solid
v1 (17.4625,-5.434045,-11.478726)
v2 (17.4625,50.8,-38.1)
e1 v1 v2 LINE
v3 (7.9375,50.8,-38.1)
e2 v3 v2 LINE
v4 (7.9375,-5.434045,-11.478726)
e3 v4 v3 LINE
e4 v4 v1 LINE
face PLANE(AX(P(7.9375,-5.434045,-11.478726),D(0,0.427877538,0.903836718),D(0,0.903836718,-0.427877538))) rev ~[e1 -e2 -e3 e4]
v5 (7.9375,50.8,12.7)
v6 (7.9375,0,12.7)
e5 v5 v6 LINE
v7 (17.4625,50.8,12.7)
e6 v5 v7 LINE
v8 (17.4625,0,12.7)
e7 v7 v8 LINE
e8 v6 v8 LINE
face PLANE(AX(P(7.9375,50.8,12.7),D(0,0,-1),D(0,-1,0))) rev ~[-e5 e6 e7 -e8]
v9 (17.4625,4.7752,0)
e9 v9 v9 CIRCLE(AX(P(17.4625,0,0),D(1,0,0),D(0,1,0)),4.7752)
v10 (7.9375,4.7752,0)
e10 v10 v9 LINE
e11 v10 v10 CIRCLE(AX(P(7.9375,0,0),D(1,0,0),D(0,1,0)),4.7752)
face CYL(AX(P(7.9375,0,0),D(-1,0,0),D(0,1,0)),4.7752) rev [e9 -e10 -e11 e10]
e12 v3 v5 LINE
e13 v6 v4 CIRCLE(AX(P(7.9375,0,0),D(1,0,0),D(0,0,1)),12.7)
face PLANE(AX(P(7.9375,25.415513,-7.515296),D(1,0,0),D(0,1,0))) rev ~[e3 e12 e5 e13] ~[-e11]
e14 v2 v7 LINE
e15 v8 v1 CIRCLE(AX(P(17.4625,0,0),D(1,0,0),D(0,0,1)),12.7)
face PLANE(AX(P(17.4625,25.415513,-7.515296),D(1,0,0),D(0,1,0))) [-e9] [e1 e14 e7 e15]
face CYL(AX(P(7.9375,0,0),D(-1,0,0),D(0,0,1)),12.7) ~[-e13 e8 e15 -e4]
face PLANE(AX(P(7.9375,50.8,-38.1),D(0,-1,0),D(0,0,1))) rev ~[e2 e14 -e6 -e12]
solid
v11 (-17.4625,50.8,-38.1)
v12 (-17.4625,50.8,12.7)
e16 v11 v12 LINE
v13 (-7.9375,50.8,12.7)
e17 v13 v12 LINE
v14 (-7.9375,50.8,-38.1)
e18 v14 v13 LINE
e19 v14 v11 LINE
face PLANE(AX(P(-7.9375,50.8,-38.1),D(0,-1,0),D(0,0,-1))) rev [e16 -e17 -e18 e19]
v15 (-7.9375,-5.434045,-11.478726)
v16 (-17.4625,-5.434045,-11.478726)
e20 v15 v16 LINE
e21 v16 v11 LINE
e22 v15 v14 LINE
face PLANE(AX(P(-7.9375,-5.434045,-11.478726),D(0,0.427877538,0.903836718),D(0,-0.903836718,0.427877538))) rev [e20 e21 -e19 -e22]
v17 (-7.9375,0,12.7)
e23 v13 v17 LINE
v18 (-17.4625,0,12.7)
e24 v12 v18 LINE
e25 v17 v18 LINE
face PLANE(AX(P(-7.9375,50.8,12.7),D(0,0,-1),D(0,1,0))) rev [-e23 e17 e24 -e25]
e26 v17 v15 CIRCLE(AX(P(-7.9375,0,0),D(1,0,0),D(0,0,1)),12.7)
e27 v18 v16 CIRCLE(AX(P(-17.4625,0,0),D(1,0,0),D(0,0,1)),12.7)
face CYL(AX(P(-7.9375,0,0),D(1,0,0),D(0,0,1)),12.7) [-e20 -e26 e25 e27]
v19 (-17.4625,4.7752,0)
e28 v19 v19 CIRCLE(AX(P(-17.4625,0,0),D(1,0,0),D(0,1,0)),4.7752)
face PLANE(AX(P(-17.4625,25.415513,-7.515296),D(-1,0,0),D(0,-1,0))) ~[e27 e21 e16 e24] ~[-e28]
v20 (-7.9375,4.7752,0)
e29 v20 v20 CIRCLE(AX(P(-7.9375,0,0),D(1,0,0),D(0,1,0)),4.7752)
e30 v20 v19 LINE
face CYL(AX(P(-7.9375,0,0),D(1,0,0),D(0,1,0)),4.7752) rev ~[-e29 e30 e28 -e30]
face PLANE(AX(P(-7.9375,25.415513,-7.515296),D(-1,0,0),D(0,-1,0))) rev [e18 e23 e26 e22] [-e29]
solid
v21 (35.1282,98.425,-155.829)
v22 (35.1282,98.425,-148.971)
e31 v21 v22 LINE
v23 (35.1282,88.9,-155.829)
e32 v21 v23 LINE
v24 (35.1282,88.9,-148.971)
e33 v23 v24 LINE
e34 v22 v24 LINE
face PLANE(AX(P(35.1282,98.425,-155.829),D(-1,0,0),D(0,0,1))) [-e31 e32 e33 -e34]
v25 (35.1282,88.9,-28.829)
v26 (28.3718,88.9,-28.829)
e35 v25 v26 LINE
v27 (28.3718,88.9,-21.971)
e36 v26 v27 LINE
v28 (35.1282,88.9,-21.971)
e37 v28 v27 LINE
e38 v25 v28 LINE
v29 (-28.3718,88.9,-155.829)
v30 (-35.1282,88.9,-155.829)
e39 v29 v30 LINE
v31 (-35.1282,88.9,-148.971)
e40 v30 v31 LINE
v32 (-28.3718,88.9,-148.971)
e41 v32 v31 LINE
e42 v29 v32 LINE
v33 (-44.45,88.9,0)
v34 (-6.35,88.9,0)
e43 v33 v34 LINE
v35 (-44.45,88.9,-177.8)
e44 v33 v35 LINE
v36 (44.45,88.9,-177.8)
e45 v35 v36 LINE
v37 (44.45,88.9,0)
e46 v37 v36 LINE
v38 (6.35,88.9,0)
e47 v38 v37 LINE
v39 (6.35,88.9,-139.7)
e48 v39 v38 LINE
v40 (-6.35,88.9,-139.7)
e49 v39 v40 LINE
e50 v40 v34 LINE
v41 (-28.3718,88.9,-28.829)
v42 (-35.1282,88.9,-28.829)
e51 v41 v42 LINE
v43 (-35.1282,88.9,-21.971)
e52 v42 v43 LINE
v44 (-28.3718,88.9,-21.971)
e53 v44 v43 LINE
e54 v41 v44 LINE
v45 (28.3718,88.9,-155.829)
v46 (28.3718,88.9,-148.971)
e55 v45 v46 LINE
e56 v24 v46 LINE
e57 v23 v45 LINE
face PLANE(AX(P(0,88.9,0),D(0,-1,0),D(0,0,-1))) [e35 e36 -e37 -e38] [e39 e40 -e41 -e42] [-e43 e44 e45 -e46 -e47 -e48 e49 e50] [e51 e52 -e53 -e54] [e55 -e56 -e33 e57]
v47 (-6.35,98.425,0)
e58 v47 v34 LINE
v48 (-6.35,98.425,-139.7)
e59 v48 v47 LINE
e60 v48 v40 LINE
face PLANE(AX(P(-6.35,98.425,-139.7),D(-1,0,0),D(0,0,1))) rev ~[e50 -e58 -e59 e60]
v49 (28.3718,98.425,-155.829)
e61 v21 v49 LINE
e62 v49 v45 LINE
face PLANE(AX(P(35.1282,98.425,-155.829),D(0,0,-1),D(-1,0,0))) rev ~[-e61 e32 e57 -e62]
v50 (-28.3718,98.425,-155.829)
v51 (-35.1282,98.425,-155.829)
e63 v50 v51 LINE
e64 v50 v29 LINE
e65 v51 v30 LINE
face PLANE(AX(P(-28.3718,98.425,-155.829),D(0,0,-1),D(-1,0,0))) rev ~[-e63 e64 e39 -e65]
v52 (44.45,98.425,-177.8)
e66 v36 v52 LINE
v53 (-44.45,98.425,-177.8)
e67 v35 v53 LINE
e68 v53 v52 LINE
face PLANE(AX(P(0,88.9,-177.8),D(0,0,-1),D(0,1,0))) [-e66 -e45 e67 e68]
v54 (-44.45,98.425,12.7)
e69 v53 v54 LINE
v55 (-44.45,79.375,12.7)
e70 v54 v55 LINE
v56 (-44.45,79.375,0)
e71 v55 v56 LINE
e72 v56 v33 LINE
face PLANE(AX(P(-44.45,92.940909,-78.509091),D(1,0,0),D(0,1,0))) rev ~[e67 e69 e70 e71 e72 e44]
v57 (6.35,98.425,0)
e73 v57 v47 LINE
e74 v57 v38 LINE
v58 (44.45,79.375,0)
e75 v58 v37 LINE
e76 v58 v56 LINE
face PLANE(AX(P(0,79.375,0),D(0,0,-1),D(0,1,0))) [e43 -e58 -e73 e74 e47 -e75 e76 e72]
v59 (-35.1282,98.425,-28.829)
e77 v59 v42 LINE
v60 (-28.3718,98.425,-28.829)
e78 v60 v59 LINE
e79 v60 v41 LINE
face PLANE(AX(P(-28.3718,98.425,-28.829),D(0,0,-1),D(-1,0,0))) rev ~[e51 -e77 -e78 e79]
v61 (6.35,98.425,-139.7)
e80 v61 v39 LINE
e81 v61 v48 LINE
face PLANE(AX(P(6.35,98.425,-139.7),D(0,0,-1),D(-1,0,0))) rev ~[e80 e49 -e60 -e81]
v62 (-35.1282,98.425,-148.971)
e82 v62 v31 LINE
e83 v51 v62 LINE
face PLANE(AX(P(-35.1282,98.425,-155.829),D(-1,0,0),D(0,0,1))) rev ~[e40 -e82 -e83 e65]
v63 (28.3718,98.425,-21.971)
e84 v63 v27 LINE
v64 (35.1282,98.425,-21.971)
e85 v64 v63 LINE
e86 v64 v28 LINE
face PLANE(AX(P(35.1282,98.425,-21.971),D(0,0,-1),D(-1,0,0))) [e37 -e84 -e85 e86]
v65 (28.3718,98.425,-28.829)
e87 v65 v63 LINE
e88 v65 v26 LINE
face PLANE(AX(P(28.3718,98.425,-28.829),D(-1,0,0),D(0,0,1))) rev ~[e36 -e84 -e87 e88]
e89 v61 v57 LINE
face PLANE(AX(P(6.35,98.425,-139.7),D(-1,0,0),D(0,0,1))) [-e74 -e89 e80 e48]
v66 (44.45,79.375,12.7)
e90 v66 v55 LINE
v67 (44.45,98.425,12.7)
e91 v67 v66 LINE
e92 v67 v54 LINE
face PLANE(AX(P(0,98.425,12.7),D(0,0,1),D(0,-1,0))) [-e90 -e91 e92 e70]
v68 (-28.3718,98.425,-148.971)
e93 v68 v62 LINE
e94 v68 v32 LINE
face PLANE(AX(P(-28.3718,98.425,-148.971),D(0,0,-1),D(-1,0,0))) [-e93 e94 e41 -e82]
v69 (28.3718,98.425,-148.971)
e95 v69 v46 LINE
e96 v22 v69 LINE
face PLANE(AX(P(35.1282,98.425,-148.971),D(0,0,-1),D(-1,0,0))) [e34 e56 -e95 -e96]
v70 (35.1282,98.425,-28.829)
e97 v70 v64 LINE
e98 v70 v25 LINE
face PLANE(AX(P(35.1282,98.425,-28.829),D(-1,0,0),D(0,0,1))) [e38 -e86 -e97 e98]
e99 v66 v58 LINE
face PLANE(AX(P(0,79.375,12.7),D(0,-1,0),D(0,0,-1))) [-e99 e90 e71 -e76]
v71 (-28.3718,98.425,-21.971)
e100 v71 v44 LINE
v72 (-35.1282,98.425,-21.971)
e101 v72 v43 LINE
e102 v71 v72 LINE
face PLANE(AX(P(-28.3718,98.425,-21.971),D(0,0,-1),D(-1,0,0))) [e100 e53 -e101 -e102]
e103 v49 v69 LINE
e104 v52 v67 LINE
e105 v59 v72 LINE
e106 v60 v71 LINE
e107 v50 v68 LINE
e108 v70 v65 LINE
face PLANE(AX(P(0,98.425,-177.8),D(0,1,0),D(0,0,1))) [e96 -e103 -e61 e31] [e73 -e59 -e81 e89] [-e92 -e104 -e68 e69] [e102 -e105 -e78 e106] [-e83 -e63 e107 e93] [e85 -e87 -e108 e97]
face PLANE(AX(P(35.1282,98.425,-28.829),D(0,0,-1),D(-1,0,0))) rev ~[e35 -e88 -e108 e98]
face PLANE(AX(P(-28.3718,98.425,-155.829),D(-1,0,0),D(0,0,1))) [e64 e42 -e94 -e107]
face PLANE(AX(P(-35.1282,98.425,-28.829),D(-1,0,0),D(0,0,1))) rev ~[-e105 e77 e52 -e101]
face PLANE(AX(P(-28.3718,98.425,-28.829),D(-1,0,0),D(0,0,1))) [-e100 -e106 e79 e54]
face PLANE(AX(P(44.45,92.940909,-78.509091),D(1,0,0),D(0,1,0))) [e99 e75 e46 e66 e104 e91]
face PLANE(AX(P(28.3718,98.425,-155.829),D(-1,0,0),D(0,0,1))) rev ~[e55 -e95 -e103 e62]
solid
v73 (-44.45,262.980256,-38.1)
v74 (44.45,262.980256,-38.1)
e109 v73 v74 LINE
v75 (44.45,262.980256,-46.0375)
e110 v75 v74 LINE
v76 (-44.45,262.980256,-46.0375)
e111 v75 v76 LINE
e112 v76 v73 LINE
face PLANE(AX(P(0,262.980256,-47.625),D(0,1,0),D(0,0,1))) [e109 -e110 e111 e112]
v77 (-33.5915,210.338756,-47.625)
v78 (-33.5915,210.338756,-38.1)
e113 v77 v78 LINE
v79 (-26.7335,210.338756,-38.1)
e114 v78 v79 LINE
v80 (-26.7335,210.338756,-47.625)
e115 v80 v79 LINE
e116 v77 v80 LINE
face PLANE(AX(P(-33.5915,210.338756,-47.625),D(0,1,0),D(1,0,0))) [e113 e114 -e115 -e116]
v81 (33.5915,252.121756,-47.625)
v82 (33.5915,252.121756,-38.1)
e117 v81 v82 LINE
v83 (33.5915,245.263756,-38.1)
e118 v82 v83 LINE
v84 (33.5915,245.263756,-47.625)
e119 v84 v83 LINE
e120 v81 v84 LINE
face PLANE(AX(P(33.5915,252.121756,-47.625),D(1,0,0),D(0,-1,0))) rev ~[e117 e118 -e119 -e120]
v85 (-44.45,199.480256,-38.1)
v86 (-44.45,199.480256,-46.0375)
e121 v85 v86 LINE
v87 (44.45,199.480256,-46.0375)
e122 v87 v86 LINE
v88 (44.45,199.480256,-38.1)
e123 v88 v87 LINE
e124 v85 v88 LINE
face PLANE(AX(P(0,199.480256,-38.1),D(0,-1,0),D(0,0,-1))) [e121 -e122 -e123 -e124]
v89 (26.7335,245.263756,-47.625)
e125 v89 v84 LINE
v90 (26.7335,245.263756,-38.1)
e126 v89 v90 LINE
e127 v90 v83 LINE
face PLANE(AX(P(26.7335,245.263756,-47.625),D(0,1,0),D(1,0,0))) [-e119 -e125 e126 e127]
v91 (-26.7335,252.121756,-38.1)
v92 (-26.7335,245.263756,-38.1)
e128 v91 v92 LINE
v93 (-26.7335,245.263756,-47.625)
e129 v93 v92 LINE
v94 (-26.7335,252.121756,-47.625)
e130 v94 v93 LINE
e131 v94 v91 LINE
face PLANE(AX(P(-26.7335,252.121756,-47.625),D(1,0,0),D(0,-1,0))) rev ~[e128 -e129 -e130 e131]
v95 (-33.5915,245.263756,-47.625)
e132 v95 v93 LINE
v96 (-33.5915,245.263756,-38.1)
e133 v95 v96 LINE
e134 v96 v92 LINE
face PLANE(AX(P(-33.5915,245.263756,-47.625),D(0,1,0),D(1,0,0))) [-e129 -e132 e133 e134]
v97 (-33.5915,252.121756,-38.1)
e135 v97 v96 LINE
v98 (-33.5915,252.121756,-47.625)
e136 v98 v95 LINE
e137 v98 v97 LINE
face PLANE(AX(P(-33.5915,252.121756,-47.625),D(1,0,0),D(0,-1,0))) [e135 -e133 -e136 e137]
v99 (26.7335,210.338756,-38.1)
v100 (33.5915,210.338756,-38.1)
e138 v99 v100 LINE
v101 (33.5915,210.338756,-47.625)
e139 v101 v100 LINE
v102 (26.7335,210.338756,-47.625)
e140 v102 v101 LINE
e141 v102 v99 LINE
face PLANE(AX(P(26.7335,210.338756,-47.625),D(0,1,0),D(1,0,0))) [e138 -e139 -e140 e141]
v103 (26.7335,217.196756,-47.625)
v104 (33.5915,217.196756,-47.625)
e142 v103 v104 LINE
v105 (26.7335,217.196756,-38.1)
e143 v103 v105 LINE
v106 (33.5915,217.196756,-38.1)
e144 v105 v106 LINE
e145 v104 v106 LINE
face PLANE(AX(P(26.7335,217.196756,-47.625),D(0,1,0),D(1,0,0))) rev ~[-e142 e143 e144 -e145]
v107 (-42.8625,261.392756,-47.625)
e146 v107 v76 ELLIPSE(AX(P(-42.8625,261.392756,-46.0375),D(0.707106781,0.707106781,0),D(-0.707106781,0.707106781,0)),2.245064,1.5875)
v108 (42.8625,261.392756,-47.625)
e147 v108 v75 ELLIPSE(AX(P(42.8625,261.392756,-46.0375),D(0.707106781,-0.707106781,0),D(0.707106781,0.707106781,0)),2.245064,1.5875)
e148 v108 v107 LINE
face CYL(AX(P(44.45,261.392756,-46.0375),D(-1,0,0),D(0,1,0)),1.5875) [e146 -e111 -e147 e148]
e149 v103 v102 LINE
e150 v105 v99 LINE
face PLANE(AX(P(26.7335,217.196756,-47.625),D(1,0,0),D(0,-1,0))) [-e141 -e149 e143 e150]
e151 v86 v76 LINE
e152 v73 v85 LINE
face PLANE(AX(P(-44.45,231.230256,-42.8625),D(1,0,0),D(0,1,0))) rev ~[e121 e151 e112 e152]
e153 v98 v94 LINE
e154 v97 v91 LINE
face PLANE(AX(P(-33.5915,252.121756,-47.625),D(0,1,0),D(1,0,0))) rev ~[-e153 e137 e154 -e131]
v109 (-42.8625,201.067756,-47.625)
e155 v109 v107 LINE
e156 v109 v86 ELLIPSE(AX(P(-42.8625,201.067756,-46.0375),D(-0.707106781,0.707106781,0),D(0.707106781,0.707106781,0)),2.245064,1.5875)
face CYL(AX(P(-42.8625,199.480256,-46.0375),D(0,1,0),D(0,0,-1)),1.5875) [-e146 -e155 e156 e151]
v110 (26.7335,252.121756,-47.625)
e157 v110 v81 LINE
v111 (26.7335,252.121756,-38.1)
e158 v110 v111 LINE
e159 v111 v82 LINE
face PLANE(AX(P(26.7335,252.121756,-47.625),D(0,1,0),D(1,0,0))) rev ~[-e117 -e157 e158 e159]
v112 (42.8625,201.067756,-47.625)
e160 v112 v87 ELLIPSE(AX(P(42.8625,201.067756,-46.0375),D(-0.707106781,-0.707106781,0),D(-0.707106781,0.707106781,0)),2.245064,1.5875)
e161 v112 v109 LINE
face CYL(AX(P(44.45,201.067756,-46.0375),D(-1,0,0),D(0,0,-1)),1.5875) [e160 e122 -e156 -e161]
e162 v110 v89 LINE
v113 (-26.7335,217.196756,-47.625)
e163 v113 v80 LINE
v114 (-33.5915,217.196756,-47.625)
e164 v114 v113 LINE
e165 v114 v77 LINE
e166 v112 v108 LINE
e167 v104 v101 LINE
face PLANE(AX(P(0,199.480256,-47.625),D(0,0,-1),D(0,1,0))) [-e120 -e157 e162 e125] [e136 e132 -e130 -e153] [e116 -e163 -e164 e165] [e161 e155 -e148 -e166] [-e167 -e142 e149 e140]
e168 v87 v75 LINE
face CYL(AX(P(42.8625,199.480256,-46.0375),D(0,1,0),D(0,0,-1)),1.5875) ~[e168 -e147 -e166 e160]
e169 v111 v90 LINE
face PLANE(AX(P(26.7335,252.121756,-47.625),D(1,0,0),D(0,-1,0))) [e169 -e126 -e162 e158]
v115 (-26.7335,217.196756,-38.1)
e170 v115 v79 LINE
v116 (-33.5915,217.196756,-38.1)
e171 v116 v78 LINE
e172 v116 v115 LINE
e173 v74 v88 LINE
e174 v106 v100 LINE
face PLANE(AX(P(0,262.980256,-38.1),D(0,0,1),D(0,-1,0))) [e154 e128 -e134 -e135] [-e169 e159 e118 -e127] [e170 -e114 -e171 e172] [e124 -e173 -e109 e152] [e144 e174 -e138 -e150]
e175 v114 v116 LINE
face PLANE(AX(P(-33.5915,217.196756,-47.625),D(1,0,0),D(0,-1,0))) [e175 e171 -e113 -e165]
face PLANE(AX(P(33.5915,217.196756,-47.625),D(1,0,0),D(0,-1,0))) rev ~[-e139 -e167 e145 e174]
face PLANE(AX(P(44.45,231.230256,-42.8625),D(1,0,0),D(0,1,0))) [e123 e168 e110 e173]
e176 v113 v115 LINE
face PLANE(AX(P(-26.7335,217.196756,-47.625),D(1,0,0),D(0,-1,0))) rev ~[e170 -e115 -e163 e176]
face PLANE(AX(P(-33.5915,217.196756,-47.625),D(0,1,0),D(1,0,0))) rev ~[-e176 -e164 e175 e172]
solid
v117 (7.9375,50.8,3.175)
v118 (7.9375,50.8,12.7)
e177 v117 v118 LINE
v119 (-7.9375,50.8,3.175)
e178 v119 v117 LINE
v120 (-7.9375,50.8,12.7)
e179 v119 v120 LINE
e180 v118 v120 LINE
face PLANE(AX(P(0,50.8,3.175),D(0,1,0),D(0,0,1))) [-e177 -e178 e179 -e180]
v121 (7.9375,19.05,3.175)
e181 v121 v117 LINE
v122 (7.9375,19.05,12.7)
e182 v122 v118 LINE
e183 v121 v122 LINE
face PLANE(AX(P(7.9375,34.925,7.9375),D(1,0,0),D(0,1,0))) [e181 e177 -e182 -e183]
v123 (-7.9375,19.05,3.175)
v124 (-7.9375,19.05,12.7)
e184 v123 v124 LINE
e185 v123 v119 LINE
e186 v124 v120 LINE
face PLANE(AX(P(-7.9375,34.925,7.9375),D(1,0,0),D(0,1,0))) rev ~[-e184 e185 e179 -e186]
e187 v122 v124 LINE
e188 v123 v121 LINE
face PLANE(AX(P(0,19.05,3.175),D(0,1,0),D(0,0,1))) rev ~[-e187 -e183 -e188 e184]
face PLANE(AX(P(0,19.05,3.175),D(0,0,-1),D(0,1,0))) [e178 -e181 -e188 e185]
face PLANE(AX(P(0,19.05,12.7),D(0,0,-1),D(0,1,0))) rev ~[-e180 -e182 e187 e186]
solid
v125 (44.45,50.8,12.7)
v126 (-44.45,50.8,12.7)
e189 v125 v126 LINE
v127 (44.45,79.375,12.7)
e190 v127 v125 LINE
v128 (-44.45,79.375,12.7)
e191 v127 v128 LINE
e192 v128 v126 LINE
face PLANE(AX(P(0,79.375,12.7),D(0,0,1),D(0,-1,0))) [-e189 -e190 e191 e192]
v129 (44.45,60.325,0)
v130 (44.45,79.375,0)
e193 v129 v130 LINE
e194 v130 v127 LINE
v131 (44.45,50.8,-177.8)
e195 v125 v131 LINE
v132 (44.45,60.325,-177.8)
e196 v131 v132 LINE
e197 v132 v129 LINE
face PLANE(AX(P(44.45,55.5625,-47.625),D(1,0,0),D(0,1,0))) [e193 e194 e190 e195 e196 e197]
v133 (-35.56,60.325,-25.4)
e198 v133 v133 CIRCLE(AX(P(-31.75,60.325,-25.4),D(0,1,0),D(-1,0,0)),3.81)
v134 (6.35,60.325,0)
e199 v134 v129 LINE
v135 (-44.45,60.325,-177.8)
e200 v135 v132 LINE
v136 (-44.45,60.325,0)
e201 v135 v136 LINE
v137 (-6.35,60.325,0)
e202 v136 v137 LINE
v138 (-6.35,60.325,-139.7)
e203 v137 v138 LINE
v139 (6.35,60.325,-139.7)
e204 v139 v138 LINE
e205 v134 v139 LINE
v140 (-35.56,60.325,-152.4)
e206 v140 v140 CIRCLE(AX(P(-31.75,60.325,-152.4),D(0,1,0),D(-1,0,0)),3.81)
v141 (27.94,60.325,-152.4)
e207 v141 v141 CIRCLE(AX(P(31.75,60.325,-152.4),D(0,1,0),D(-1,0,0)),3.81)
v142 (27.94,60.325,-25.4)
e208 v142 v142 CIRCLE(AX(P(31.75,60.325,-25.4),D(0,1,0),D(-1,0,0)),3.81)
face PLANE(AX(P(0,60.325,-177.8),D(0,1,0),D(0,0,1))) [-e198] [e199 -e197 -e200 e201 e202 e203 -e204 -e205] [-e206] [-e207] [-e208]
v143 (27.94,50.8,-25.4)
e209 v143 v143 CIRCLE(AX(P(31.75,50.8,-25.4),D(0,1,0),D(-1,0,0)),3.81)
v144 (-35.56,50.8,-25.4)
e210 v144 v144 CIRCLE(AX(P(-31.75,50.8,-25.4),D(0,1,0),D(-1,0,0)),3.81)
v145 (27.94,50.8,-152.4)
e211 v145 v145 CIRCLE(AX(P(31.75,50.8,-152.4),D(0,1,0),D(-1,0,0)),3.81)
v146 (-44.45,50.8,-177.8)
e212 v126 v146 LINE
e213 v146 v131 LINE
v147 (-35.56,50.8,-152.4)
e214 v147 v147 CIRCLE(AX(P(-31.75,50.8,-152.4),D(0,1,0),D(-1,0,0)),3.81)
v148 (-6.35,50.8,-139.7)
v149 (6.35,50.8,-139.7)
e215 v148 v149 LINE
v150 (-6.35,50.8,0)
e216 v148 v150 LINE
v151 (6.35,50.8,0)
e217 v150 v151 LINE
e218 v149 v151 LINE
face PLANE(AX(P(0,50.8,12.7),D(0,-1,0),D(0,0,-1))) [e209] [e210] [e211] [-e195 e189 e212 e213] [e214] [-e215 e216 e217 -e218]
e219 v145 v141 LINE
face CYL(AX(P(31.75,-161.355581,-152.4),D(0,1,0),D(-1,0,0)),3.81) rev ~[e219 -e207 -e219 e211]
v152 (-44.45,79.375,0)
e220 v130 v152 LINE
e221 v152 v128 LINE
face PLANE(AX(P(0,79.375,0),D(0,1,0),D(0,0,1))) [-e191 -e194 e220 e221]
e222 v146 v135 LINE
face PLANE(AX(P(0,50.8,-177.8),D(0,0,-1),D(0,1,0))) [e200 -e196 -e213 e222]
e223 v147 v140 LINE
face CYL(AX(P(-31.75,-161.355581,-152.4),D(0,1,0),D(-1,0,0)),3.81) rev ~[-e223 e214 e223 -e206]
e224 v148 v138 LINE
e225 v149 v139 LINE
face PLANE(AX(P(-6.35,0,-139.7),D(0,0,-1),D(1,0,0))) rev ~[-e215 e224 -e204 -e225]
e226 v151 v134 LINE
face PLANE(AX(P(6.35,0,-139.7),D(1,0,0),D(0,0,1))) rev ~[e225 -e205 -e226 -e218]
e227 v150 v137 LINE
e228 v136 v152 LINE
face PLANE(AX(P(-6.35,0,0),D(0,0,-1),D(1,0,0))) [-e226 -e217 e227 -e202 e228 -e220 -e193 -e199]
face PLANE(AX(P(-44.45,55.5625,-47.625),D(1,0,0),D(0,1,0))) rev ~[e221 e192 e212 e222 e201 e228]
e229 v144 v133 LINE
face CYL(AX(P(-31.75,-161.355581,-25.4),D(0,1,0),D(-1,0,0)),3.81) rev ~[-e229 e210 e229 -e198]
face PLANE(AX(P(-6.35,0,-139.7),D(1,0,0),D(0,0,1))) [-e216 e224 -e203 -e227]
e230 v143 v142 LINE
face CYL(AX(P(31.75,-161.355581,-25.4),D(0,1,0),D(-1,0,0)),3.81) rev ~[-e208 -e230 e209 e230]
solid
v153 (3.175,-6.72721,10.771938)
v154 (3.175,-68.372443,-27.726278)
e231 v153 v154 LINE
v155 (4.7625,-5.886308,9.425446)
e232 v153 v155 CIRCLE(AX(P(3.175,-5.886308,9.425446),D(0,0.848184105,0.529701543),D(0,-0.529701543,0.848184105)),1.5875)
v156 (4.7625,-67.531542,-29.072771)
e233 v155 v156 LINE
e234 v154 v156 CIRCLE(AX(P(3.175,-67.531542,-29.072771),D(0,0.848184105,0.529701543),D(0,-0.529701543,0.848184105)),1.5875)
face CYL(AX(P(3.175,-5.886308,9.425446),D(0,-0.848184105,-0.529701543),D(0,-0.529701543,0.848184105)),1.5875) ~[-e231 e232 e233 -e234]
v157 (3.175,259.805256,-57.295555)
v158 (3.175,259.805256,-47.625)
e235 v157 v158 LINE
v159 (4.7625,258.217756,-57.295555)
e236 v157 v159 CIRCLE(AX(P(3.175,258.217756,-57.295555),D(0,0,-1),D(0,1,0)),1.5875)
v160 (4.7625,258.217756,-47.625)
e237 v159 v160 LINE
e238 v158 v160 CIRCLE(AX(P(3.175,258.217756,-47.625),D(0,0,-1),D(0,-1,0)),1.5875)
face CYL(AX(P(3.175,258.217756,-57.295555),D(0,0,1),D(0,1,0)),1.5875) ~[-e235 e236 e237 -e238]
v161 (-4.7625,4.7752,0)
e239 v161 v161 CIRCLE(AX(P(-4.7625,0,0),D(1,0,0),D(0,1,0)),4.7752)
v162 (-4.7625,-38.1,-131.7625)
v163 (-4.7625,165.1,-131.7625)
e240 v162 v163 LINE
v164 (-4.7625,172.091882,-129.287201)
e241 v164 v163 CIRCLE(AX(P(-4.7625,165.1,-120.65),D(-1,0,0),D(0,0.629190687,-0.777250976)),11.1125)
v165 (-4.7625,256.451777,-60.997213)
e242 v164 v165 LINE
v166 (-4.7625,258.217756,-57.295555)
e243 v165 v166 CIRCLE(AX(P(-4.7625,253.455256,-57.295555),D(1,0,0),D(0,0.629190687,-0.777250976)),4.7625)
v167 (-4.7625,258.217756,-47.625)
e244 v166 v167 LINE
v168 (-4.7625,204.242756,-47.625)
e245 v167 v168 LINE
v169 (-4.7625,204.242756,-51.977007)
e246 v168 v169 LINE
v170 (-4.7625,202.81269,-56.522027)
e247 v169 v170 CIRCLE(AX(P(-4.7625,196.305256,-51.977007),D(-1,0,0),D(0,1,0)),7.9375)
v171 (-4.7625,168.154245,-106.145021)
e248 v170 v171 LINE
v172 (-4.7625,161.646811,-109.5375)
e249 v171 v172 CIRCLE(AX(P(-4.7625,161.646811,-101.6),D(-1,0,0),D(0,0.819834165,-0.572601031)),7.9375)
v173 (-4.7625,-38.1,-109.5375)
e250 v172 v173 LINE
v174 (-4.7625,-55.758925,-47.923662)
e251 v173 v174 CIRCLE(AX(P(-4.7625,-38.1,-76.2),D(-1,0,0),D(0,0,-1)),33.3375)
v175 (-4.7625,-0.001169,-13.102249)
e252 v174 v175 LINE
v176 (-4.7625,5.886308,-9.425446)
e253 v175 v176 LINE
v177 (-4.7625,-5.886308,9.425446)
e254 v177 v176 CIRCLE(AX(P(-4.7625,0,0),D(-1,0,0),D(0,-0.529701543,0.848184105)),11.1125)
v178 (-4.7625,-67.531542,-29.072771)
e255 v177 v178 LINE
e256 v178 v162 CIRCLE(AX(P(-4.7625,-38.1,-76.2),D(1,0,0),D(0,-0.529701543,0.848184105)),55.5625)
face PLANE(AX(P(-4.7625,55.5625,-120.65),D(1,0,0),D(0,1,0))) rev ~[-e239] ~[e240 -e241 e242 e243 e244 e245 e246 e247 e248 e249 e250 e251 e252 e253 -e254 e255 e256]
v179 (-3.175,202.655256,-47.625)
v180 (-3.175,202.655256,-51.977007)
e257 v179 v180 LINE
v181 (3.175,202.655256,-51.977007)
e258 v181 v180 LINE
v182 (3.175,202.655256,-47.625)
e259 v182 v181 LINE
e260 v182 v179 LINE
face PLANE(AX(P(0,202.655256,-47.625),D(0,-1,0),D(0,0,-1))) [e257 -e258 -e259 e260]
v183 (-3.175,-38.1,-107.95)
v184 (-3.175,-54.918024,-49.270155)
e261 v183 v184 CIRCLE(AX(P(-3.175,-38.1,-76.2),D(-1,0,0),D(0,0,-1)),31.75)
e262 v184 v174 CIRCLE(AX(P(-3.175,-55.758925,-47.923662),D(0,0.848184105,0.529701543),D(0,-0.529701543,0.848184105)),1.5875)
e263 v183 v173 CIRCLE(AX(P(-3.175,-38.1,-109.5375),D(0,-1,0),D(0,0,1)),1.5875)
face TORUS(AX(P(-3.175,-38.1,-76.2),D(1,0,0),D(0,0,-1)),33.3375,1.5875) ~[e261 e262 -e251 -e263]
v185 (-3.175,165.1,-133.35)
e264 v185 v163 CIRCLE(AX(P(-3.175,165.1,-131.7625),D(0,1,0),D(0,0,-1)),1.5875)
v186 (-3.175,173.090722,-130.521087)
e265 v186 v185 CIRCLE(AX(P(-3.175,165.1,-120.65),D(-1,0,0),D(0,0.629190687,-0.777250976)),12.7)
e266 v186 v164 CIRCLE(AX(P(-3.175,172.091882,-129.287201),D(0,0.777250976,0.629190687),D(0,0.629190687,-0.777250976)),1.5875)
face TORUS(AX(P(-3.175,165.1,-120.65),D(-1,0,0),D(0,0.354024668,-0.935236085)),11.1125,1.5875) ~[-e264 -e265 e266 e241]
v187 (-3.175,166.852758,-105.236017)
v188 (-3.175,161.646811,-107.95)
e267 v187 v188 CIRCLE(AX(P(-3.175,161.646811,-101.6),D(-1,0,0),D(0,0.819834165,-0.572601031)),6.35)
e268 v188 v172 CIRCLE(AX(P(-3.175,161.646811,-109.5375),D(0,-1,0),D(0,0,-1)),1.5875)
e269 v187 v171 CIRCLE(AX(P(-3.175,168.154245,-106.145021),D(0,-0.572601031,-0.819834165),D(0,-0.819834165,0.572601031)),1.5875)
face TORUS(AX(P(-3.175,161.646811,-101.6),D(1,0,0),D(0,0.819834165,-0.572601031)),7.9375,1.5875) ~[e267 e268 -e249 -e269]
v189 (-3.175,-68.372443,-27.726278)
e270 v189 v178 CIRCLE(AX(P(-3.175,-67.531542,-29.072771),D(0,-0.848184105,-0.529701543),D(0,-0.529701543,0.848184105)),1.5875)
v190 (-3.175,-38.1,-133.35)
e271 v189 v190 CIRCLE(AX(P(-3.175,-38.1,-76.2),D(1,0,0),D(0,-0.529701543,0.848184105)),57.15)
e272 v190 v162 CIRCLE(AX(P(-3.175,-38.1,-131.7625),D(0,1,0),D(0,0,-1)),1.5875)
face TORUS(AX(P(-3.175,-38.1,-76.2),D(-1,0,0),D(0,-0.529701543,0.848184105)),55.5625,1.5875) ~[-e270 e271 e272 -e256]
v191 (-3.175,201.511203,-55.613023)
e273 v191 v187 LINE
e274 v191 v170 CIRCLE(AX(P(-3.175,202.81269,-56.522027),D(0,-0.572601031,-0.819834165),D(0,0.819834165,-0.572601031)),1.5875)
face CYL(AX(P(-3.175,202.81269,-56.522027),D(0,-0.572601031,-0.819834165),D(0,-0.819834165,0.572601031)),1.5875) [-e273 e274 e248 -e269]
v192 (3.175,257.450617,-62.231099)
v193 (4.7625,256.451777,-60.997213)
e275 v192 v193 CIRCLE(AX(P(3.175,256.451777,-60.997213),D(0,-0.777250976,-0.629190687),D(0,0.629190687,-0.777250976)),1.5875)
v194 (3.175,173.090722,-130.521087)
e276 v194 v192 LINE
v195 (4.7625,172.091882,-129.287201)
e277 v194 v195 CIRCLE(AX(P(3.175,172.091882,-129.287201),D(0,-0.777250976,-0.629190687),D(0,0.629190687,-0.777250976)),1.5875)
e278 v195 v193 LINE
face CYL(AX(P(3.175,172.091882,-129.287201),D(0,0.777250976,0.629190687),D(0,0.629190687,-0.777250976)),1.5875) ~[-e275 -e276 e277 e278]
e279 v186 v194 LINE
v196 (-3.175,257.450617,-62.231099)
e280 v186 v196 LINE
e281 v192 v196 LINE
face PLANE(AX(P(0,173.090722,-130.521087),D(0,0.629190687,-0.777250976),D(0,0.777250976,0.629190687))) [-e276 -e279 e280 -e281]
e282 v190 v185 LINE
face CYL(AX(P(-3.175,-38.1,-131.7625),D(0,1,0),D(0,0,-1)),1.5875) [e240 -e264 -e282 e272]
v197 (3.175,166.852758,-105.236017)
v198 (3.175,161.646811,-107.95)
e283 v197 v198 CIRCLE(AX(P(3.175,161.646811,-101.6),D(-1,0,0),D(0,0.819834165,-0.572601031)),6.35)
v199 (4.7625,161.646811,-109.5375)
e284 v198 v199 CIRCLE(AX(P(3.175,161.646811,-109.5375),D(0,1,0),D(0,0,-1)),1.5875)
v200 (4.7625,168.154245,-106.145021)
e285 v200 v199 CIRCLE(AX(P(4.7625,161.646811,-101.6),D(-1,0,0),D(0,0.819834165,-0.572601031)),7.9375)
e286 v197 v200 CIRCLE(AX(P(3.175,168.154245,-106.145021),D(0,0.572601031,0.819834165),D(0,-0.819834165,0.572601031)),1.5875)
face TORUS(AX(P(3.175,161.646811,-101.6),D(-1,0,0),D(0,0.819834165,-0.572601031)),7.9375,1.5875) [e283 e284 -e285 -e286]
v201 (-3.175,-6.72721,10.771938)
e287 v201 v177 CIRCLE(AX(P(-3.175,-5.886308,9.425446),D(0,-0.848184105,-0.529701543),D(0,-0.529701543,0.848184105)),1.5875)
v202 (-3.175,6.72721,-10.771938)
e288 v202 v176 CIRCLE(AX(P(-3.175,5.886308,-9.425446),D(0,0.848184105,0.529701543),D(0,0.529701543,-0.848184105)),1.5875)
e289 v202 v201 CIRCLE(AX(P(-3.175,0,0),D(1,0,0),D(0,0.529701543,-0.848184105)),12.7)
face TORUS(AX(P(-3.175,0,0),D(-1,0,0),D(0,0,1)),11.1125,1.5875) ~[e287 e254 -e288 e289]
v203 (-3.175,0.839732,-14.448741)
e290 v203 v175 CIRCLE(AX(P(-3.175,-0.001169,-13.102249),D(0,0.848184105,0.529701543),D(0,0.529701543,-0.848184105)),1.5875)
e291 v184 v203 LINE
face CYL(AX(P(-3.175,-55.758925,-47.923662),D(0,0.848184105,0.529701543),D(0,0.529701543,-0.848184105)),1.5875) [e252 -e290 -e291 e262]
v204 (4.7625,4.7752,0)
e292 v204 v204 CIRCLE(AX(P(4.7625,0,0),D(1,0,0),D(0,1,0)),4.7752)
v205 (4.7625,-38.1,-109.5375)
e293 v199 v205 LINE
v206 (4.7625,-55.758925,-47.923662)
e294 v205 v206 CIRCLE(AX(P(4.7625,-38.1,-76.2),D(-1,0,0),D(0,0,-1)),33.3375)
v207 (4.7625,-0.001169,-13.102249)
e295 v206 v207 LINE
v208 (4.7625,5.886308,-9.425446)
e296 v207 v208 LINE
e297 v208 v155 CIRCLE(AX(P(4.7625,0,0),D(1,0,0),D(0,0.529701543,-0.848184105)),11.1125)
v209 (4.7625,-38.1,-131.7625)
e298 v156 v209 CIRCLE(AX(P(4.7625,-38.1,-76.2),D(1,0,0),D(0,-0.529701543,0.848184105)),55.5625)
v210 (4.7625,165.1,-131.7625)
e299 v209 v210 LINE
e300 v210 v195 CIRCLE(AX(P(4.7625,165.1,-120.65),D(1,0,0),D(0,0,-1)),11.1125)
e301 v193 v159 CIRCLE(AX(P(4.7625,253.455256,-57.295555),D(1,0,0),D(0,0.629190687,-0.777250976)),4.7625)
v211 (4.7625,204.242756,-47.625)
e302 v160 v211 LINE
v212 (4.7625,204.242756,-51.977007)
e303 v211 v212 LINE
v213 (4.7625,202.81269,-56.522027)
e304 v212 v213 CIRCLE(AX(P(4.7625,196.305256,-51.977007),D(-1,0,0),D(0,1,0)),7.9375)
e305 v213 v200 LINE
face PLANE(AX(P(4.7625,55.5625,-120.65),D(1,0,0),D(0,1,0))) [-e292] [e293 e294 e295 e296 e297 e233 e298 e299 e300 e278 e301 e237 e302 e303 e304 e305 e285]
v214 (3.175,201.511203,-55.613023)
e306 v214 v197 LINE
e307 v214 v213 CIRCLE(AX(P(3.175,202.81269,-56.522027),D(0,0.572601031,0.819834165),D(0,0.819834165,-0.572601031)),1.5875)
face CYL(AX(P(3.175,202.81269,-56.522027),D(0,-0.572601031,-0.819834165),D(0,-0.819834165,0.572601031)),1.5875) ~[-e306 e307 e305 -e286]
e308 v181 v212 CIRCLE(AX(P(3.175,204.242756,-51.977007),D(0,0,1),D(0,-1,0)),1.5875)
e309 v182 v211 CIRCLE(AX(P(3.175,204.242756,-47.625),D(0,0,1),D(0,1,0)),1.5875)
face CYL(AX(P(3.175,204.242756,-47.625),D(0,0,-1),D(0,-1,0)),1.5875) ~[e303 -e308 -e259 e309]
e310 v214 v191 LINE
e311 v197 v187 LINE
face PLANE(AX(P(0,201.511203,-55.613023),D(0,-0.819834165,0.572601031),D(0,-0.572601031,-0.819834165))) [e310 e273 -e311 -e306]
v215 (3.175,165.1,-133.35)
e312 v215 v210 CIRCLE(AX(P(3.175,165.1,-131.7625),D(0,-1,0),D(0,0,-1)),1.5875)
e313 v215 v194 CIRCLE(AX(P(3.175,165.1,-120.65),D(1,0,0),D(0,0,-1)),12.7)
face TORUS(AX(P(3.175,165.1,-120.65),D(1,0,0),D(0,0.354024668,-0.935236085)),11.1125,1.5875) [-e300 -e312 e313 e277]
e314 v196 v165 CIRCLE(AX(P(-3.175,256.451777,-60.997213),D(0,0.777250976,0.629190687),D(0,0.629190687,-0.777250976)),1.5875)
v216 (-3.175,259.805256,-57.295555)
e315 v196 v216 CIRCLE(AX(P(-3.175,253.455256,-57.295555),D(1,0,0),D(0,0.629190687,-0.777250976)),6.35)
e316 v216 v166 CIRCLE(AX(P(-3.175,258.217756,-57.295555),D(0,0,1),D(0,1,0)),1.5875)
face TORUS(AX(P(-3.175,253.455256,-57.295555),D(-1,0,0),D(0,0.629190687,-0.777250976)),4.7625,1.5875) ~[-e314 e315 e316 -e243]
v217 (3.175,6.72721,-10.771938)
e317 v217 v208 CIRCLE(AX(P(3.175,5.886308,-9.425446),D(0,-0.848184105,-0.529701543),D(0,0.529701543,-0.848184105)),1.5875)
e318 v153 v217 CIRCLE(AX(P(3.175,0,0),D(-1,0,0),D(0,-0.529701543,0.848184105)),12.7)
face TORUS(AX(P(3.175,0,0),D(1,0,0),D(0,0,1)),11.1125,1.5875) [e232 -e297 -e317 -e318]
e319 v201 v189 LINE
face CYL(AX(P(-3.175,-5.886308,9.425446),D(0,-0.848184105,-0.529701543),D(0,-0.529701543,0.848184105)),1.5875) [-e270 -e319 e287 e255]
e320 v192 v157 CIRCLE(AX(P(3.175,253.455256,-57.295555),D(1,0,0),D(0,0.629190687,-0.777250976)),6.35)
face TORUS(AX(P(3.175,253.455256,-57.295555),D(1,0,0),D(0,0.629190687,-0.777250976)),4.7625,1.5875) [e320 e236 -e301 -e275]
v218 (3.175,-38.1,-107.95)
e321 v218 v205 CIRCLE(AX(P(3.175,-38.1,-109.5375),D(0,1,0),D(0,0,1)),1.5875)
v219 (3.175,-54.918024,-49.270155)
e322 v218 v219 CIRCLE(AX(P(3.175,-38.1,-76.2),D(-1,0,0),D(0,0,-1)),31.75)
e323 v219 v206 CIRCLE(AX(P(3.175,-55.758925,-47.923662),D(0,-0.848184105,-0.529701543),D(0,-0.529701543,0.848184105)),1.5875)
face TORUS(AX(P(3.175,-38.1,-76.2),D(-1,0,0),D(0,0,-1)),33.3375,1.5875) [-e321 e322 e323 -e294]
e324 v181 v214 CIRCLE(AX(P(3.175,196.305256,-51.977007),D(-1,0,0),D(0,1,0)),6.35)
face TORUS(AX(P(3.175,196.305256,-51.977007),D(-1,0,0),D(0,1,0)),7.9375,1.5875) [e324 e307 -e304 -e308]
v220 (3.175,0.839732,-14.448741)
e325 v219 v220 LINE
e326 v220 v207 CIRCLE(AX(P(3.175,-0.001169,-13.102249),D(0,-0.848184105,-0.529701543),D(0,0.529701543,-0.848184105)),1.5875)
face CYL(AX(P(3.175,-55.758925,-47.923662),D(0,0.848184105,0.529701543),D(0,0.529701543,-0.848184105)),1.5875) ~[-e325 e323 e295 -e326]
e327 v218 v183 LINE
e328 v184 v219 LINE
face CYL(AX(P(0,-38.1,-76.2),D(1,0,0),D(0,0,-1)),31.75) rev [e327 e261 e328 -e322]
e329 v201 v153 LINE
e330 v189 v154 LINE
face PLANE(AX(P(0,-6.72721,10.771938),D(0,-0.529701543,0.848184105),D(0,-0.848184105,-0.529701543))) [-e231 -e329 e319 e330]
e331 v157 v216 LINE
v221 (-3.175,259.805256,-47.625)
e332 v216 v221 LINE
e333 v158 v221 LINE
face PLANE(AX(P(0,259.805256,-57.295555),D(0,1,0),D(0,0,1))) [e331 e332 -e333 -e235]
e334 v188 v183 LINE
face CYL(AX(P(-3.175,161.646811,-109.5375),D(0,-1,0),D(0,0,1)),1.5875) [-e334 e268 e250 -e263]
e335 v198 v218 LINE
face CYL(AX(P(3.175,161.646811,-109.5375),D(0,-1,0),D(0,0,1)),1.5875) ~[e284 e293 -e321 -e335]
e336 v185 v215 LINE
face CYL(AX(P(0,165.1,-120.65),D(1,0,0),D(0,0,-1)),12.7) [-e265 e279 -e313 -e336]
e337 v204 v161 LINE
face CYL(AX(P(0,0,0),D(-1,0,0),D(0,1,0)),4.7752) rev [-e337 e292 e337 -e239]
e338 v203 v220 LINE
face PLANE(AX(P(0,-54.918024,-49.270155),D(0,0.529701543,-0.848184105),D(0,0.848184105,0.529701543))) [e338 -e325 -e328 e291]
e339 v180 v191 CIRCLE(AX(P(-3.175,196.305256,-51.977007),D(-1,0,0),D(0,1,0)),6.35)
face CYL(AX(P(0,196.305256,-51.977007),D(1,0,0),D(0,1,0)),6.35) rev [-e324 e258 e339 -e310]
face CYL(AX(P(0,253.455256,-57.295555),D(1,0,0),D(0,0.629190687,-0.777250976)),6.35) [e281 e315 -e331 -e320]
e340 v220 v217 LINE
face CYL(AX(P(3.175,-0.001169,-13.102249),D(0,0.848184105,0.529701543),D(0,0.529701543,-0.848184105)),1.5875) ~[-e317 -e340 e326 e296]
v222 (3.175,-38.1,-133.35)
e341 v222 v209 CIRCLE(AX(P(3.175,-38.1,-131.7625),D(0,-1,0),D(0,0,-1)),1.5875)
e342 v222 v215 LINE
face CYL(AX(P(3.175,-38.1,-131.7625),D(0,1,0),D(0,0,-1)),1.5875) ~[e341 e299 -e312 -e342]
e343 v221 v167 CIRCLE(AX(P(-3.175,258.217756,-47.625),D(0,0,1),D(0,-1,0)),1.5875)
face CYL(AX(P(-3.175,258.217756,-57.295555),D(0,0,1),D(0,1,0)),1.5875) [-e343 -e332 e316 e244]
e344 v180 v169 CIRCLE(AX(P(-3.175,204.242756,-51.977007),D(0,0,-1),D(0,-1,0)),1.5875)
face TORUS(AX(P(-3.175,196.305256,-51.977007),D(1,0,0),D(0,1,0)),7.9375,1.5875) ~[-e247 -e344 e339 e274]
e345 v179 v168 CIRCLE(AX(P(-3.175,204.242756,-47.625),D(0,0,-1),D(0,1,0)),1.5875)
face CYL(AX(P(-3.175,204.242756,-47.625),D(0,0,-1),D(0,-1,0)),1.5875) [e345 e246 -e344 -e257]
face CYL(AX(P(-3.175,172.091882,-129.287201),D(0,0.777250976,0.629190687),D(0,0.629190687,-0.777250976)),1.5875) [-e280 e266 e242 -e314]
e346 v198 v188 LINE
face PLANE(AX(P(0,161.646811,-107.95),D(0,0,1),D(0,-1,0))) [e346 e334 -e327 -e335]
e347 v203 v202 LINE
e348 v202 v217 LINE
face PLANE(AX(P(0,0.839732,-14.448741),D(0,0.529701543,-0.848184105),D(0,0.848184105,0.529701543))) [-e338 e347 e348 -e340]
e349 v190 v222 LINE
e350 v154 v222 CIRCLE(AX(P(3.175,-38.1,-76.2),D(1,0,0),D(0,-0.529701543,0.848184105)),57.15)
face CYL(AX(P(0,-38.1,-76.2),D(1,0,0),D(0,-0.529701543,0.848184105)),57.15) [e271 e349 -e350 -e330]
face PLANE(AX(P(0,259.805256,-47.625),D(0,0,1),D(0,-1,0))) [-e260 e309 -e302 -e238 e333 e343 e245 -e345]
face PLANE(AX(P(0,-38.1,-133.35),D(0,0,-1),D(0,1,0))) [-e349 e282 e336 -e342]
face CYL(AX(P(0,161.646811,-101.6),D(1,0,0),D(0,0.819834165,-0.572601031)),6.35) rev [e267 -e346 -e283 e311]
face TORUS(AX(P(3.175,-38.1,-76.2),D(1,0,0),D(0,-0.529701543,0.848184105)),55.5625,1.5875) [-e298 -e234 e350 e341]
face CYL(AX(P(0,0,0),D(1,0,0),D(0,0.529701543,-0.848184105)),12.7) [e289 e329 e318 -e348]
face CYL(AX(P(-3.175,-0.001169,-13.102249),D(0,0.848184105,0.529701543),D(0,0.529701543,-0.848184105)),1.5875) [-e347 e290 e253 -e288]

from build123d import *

# Parameters (mm, degrees)
F0_W           = 9.525
F0_H           = 25.4
F0_R           = 4.7752
F1_DEPTH       = 4.7625
F4_R           = 4.7752
F5_DEPTH       = 9.525
F0_H_2         = 44.45
F0_W_2         = 19.05
F0_H_3         = 12.7
F7_DEPTH       = 44.45
F9_W           = 12.7
F9_H           = 139.7
F10_DEPTH      = 76.2
F0_W_3         = 31.75
F0_H_4         = 9.525
F12_DEPTH      = 7.9375
F12_DEPTH_BACK = 7.9375
F13_R          = 1.5875
F14_R          = 1.5875
F15_W          = 6.858
F15_H          = 6.858
F16_DEPTH      = 9.525
F18_D          = 7.62
F19_DEPTH      = 44.45
F21_DEPTH      = 44.45
F21_DEPTH_BACK = 44.45
F22_W          = 12.7
F22_H          = 139.7
F22_W_2        = 6.7564
F22_H_2        = 6.858
F23_DEPTH      = 9.525


# Not quite as in the source:
# - a feature names something its author has since deleted; it is built from what else it names


with BuildPart() as f1:
    # F0 (on Right) → F1 (new body, symmetric)
    with BuildSketch(Plane.YZ):
        with Locations((55.5625, -120.65)):
            Rectangle(F0_W, F0_H)
        with BuildLine():
            Line((-38.1, -133.35), (50.8, -133.35))
            Line((50.8, -133.35), (50.8, -107.95))
            Line((50.8, -107.95), (-38.1, -107.95))
            ThreePointArc((-38.1, -107.95), (-68.6211818995, -84.9475685454), (-54.9180239844, -49.2701546744))
            Line((-54.9180239844, -49.2701546744), (0.8397324108, -14.4487409961))
            Line((0.8397324108, -14.4487409961), (-5.434044736, -11.4787263147))
            ThreePointArc((-5.434044736, -11.4787263147), (-12.6786057506, -0.7368556316), (-6.7272095938, 10.7719381302))
            Line((-6.7272095938, 10.7719381302), (-68.372443172, -27.726278414))
            ThreePointArc((-68.372443172, -27.726278414), (-93.0381274191, -91.9456233818), (-38.1, -133.35))
        make_face()
        with BuildLine():
            Line((60.325, -133.35), (165.1, -133.35))
            ThreePointArc((165.1, -133.35), (167.385363414, -133.1426824208), (169.5961132831, -132.5274982781))
            ThreePointArc((169.5961132831, -132.5274982781), (171.423502452, -131.6637784951), (173.0907217208, -130.521087396))
            Line((173.0907217208, -130.521087396), (257.4506169815, -62.2310986255))
            ThreePointArc((257.4506169815, -62.2310986255), (259.1864445434, -60.0297786323), (259.8052561211, -57.2955549274))
            Line((259.8052561211, -57.2955549274), (259.8052561211, -47.625))
            Line((259.8052561211, -47.625), (202.6552561211, -47.625))
            Line((202.6552561211, -47.625), (202.6552561211, -51.977006656))
            ThreePointArc((202.6552561211, -51.977006656), (202.3624940698, -53.8828839953), (201.5112030715, -55.6130232057))
            Line((201.5112030715, -55.6130232057), (166.8527582665, -105.2360165496))
            ThreePointArc((166.8527582665, -105.2360165496), (164.5822665541, -107.2307728195), (161.646811316, -107.95))
            Line((161.646811316, -107.95), (60.325, -107.95))
            Line((60.325, -107.95), (60.325, -133.35))
        make_face()
        with BuildLine():
            ThreePointArc((0, 12.7), (-3.4990274182, 12.2084727598), (-6.7272095938, 10.7719381302))
            ThreePointArc((-6.7272095938, 10.7719381302), (-12.6786057506, -0.7368556316), (-5.434044736, -11.4787263147))
            Line((-5.434044736, -11.4787263147), (0.8397324108, -14.4487409961))
            Line((0.8397324108, -14.4487409961), (6.7272095938, -10.7719381302))
            ThreePointArc((6.7272095938, -10.7719381302), (12.2084727598, 3.4990274182), (0, 12.7))
        make_face()
        Circle(F0_R, mode=Mode.SUBTRACT)
    extrude(amount=F1_DEPTH, both=True)

    # F13
    f13_edges = [f1.edges().sort_by_distance(p)[0] for p in [
        (4.7625, 164.582267, -107.230773),
        (4.7625, 61.773406, -107.95),
        (4.7625, -68.621182, -84.947569),
        (4.7625, -24.095407, -30.021046),
        (4.7625, -37.549826, -8.47717),
        (4.7625, -93.038127, -91.945623),
        (4.7625, 63.5, -133.35),
        (4.7625, 169.338348, -132.621901),
        (4.7625, 215.270669, -96.376093),
        (4.7625, 10.771938, 6.72721),
        (-4.7625, -37.549826, -8.47717),
        (-4.7625, -93.038127, -91.945623),
        (-4.7625, 10.771938, 6.72721),
        (-4.7625, -24.095407, -30.021046),
        (-4.7625, -68.621182, -84.947569),
        (-4.7625, 61.773406, -107.95),
        (-4.7625, 164.582267, -107.230773),
        (-4.7625, 184.181981, -80.42452),
    ]]
    fillet(f13_edges, radius=F13_R)


with BuildPart() as f5:
    # F4 (on offset) → F5 (new body)
    with BuildSketch(Plane.YZ.offset(7.9375)):
        with BuildLine():
            Line((50.8, 12.7), (0, 12.7))
            ThreePointArc((0, 12.7), (-12.3909205509, 2.7847958456), (-5.434044736, -11.4787263147))
            Line((-5.434044736, -11.4787263147), (50.8, -38.1))
            Line((50.8, -38.1), (50.8, 12.7))
        make_face()
        Circle(F4_R, mode=Mode.SUBTRACT)
    extrude(amount=F5_DEPTH)


with BuildPart() as f6_1:
    # F6: instance of F5
    add(f5.part.mirror(Plane.YZ))


with BuildPart() as f7:
    # F0 (on Right) → F7 (new body, symmetric)
    with BuildSketch(Plane.YZ):
        Polygon((50.8, -107.95), (60.325, -107.95), (60.325, 0), (60.325, 12.7), (50.8, 12.7), (50.8, 3.175), (50.8, -38.1), align=None)
        with Locations((55.5625, -155.575)):
            Rectangle(F0_W, F0_H_2)
        with Locations((55.5625, -120.65)):
            Rectangle(F0_W, F0_H)
        with Locations((69.85, 6.35)):
            Rectangle(F0_W_2, F0_H_3)
    extrude(amount=F7_DEPTH, both=True)


with BuildPart() as f7b:
    # F0 (on Right) → F7, piece 2 (new body, symmetric)
    with BuildSketch(Plane.YZ):
        Polygon((202.6552561211, -47.625), (259.8052561211, -47.625), (262.9802561211, -47.625), (262.9802561211, -38.1), (199.4802561211, -38.1), (199.4802561211, -47.625), align=None)
    extrude(amount=F7_DEPTH, both=True)

    # F14
    f14_edges = [f7b.edges().sort_by_distance(p)[0] for p in [
        (-44.45, 231.230256, -47.625),
        (0, 199.480256, -47.625),
        (44.45, 231.230256, -47.625),
        (0, 262.980256, -47.625),
    ]]
    fillet(f14_edges, radius=F14_R)

    # F15 (on face) → F16 (cut)
    with BuildSketch(Plane(origin=(0, 0, -47.625), x_dir=(1, 0, 0), z_dir=(0, 0, -1))):
        with Locations((-30.1625, -213.7677561211)):
            Rectangle(F15_W, F15_H)
        with Locations((30.1625, -213.7677561211)):
            Rectangle(F15_W, F15_H)
        with Locations((-30.1625, -248.6927561211)):
            Rectangle(F15_W, F15_H)
        with Locations((30.1625, -248.6927561211)):
            Rectangle(F15_W, F15_H)
    extrude(amount=-F16_DEPTH, mode=Mode.SUBTRACT)


with BuildPart() as f10:
    # F9 (on Front) → F10 (new body)
    with BuildSketch(Plane.XZ):
        with Locations((0, -69.85)):
            Rectangle(F9_W, F9_H)
    extrude(amount=-F10_DEPTH)


with BuildPart() as f5_1:
    add(f5.part)

    # F11: cut F10
    add(f10.part, mode=Mode.SUBTRACT)


with BuildPart() as f7_1:
    add(f7.part)

    # F11: cut F10
    add(f10.part, mode=Mode.SUBTRACT)

    # F18 (through all)
    with Locations(Plane.XZ.offset(-50.8)):
        with Locations((31.75, -152.4), (-31.75, -152.4), (31.75, -25.4), (-31.75, -25.4)):
            Hole(F18_D / 2)

    # F0 (on Right) → F19 (join, symmetric)
    with BuildSketch(Plane.YZ):
        with Locations((69.85, 6.35)):
            Rectangle(F0_W_2, F0_H_3)
    extrude(amount=F19_DEPTH, both=True)


with BuildPart() as f12:
    # F0 (on Right) → F12 (new body, two sides)
    with BuildSketch(Plane.YZ) as f12_sk:
        with Locations((34.925, 7.9375)):
            Rectangle(F0_W_3, F0_H_4)
    extrude(amount=F12_DEPTH)
    extrude(f12_sk.sketch, amount=-F12_DEPTH_BACK)


with BuildPart() as f21:
    # F20 (on Right) → F21 (new body, two sides)
    with BuildSketch(Plane.YZ) as f21_sk:
        Polygon((79.375, 0), (88.9, 0), (88.9, -177.8), (98.425, -177.8), (98.425, 12.7), (79.375, 12.7), align=None)
    extrude(amount=F21_DEPTH)
    extrude(f21_sk.sketch, amount=-F21_DEPTH_BACK)

    # F22 (on face) → F23 (cut)
    with BuildSketch(Plane(origin=(0, 98.425, 0), x_dir=(-1, 0, 0), z_dir=(0, 1, 0))):
        with Locations((0, -69.85)):
            Rectangle(F22_W, F22_H)
        with Locations((-31.75, -25.4)):
            Rectangle(F22_W_2, F22_H_2)
        with Locations((31.75, -152.4)):
            Rectangle(F22_W_2, F22_H_2)
        with Locations((-31.75, -152.4)):
            Rectangle(F22_W_2, F22_H_2)
        with Locations((31.75, -25.4)):
            Rectangle(F22_W_2, F22_H_2)
    extrude(amount=-F23_DEPTH, mode=Mode.SUBTRACT)


solid = Compound([f1.part, f6_1.part, f7b.part, f5_1.part, f7_1.part, f12.part, f21.part])
